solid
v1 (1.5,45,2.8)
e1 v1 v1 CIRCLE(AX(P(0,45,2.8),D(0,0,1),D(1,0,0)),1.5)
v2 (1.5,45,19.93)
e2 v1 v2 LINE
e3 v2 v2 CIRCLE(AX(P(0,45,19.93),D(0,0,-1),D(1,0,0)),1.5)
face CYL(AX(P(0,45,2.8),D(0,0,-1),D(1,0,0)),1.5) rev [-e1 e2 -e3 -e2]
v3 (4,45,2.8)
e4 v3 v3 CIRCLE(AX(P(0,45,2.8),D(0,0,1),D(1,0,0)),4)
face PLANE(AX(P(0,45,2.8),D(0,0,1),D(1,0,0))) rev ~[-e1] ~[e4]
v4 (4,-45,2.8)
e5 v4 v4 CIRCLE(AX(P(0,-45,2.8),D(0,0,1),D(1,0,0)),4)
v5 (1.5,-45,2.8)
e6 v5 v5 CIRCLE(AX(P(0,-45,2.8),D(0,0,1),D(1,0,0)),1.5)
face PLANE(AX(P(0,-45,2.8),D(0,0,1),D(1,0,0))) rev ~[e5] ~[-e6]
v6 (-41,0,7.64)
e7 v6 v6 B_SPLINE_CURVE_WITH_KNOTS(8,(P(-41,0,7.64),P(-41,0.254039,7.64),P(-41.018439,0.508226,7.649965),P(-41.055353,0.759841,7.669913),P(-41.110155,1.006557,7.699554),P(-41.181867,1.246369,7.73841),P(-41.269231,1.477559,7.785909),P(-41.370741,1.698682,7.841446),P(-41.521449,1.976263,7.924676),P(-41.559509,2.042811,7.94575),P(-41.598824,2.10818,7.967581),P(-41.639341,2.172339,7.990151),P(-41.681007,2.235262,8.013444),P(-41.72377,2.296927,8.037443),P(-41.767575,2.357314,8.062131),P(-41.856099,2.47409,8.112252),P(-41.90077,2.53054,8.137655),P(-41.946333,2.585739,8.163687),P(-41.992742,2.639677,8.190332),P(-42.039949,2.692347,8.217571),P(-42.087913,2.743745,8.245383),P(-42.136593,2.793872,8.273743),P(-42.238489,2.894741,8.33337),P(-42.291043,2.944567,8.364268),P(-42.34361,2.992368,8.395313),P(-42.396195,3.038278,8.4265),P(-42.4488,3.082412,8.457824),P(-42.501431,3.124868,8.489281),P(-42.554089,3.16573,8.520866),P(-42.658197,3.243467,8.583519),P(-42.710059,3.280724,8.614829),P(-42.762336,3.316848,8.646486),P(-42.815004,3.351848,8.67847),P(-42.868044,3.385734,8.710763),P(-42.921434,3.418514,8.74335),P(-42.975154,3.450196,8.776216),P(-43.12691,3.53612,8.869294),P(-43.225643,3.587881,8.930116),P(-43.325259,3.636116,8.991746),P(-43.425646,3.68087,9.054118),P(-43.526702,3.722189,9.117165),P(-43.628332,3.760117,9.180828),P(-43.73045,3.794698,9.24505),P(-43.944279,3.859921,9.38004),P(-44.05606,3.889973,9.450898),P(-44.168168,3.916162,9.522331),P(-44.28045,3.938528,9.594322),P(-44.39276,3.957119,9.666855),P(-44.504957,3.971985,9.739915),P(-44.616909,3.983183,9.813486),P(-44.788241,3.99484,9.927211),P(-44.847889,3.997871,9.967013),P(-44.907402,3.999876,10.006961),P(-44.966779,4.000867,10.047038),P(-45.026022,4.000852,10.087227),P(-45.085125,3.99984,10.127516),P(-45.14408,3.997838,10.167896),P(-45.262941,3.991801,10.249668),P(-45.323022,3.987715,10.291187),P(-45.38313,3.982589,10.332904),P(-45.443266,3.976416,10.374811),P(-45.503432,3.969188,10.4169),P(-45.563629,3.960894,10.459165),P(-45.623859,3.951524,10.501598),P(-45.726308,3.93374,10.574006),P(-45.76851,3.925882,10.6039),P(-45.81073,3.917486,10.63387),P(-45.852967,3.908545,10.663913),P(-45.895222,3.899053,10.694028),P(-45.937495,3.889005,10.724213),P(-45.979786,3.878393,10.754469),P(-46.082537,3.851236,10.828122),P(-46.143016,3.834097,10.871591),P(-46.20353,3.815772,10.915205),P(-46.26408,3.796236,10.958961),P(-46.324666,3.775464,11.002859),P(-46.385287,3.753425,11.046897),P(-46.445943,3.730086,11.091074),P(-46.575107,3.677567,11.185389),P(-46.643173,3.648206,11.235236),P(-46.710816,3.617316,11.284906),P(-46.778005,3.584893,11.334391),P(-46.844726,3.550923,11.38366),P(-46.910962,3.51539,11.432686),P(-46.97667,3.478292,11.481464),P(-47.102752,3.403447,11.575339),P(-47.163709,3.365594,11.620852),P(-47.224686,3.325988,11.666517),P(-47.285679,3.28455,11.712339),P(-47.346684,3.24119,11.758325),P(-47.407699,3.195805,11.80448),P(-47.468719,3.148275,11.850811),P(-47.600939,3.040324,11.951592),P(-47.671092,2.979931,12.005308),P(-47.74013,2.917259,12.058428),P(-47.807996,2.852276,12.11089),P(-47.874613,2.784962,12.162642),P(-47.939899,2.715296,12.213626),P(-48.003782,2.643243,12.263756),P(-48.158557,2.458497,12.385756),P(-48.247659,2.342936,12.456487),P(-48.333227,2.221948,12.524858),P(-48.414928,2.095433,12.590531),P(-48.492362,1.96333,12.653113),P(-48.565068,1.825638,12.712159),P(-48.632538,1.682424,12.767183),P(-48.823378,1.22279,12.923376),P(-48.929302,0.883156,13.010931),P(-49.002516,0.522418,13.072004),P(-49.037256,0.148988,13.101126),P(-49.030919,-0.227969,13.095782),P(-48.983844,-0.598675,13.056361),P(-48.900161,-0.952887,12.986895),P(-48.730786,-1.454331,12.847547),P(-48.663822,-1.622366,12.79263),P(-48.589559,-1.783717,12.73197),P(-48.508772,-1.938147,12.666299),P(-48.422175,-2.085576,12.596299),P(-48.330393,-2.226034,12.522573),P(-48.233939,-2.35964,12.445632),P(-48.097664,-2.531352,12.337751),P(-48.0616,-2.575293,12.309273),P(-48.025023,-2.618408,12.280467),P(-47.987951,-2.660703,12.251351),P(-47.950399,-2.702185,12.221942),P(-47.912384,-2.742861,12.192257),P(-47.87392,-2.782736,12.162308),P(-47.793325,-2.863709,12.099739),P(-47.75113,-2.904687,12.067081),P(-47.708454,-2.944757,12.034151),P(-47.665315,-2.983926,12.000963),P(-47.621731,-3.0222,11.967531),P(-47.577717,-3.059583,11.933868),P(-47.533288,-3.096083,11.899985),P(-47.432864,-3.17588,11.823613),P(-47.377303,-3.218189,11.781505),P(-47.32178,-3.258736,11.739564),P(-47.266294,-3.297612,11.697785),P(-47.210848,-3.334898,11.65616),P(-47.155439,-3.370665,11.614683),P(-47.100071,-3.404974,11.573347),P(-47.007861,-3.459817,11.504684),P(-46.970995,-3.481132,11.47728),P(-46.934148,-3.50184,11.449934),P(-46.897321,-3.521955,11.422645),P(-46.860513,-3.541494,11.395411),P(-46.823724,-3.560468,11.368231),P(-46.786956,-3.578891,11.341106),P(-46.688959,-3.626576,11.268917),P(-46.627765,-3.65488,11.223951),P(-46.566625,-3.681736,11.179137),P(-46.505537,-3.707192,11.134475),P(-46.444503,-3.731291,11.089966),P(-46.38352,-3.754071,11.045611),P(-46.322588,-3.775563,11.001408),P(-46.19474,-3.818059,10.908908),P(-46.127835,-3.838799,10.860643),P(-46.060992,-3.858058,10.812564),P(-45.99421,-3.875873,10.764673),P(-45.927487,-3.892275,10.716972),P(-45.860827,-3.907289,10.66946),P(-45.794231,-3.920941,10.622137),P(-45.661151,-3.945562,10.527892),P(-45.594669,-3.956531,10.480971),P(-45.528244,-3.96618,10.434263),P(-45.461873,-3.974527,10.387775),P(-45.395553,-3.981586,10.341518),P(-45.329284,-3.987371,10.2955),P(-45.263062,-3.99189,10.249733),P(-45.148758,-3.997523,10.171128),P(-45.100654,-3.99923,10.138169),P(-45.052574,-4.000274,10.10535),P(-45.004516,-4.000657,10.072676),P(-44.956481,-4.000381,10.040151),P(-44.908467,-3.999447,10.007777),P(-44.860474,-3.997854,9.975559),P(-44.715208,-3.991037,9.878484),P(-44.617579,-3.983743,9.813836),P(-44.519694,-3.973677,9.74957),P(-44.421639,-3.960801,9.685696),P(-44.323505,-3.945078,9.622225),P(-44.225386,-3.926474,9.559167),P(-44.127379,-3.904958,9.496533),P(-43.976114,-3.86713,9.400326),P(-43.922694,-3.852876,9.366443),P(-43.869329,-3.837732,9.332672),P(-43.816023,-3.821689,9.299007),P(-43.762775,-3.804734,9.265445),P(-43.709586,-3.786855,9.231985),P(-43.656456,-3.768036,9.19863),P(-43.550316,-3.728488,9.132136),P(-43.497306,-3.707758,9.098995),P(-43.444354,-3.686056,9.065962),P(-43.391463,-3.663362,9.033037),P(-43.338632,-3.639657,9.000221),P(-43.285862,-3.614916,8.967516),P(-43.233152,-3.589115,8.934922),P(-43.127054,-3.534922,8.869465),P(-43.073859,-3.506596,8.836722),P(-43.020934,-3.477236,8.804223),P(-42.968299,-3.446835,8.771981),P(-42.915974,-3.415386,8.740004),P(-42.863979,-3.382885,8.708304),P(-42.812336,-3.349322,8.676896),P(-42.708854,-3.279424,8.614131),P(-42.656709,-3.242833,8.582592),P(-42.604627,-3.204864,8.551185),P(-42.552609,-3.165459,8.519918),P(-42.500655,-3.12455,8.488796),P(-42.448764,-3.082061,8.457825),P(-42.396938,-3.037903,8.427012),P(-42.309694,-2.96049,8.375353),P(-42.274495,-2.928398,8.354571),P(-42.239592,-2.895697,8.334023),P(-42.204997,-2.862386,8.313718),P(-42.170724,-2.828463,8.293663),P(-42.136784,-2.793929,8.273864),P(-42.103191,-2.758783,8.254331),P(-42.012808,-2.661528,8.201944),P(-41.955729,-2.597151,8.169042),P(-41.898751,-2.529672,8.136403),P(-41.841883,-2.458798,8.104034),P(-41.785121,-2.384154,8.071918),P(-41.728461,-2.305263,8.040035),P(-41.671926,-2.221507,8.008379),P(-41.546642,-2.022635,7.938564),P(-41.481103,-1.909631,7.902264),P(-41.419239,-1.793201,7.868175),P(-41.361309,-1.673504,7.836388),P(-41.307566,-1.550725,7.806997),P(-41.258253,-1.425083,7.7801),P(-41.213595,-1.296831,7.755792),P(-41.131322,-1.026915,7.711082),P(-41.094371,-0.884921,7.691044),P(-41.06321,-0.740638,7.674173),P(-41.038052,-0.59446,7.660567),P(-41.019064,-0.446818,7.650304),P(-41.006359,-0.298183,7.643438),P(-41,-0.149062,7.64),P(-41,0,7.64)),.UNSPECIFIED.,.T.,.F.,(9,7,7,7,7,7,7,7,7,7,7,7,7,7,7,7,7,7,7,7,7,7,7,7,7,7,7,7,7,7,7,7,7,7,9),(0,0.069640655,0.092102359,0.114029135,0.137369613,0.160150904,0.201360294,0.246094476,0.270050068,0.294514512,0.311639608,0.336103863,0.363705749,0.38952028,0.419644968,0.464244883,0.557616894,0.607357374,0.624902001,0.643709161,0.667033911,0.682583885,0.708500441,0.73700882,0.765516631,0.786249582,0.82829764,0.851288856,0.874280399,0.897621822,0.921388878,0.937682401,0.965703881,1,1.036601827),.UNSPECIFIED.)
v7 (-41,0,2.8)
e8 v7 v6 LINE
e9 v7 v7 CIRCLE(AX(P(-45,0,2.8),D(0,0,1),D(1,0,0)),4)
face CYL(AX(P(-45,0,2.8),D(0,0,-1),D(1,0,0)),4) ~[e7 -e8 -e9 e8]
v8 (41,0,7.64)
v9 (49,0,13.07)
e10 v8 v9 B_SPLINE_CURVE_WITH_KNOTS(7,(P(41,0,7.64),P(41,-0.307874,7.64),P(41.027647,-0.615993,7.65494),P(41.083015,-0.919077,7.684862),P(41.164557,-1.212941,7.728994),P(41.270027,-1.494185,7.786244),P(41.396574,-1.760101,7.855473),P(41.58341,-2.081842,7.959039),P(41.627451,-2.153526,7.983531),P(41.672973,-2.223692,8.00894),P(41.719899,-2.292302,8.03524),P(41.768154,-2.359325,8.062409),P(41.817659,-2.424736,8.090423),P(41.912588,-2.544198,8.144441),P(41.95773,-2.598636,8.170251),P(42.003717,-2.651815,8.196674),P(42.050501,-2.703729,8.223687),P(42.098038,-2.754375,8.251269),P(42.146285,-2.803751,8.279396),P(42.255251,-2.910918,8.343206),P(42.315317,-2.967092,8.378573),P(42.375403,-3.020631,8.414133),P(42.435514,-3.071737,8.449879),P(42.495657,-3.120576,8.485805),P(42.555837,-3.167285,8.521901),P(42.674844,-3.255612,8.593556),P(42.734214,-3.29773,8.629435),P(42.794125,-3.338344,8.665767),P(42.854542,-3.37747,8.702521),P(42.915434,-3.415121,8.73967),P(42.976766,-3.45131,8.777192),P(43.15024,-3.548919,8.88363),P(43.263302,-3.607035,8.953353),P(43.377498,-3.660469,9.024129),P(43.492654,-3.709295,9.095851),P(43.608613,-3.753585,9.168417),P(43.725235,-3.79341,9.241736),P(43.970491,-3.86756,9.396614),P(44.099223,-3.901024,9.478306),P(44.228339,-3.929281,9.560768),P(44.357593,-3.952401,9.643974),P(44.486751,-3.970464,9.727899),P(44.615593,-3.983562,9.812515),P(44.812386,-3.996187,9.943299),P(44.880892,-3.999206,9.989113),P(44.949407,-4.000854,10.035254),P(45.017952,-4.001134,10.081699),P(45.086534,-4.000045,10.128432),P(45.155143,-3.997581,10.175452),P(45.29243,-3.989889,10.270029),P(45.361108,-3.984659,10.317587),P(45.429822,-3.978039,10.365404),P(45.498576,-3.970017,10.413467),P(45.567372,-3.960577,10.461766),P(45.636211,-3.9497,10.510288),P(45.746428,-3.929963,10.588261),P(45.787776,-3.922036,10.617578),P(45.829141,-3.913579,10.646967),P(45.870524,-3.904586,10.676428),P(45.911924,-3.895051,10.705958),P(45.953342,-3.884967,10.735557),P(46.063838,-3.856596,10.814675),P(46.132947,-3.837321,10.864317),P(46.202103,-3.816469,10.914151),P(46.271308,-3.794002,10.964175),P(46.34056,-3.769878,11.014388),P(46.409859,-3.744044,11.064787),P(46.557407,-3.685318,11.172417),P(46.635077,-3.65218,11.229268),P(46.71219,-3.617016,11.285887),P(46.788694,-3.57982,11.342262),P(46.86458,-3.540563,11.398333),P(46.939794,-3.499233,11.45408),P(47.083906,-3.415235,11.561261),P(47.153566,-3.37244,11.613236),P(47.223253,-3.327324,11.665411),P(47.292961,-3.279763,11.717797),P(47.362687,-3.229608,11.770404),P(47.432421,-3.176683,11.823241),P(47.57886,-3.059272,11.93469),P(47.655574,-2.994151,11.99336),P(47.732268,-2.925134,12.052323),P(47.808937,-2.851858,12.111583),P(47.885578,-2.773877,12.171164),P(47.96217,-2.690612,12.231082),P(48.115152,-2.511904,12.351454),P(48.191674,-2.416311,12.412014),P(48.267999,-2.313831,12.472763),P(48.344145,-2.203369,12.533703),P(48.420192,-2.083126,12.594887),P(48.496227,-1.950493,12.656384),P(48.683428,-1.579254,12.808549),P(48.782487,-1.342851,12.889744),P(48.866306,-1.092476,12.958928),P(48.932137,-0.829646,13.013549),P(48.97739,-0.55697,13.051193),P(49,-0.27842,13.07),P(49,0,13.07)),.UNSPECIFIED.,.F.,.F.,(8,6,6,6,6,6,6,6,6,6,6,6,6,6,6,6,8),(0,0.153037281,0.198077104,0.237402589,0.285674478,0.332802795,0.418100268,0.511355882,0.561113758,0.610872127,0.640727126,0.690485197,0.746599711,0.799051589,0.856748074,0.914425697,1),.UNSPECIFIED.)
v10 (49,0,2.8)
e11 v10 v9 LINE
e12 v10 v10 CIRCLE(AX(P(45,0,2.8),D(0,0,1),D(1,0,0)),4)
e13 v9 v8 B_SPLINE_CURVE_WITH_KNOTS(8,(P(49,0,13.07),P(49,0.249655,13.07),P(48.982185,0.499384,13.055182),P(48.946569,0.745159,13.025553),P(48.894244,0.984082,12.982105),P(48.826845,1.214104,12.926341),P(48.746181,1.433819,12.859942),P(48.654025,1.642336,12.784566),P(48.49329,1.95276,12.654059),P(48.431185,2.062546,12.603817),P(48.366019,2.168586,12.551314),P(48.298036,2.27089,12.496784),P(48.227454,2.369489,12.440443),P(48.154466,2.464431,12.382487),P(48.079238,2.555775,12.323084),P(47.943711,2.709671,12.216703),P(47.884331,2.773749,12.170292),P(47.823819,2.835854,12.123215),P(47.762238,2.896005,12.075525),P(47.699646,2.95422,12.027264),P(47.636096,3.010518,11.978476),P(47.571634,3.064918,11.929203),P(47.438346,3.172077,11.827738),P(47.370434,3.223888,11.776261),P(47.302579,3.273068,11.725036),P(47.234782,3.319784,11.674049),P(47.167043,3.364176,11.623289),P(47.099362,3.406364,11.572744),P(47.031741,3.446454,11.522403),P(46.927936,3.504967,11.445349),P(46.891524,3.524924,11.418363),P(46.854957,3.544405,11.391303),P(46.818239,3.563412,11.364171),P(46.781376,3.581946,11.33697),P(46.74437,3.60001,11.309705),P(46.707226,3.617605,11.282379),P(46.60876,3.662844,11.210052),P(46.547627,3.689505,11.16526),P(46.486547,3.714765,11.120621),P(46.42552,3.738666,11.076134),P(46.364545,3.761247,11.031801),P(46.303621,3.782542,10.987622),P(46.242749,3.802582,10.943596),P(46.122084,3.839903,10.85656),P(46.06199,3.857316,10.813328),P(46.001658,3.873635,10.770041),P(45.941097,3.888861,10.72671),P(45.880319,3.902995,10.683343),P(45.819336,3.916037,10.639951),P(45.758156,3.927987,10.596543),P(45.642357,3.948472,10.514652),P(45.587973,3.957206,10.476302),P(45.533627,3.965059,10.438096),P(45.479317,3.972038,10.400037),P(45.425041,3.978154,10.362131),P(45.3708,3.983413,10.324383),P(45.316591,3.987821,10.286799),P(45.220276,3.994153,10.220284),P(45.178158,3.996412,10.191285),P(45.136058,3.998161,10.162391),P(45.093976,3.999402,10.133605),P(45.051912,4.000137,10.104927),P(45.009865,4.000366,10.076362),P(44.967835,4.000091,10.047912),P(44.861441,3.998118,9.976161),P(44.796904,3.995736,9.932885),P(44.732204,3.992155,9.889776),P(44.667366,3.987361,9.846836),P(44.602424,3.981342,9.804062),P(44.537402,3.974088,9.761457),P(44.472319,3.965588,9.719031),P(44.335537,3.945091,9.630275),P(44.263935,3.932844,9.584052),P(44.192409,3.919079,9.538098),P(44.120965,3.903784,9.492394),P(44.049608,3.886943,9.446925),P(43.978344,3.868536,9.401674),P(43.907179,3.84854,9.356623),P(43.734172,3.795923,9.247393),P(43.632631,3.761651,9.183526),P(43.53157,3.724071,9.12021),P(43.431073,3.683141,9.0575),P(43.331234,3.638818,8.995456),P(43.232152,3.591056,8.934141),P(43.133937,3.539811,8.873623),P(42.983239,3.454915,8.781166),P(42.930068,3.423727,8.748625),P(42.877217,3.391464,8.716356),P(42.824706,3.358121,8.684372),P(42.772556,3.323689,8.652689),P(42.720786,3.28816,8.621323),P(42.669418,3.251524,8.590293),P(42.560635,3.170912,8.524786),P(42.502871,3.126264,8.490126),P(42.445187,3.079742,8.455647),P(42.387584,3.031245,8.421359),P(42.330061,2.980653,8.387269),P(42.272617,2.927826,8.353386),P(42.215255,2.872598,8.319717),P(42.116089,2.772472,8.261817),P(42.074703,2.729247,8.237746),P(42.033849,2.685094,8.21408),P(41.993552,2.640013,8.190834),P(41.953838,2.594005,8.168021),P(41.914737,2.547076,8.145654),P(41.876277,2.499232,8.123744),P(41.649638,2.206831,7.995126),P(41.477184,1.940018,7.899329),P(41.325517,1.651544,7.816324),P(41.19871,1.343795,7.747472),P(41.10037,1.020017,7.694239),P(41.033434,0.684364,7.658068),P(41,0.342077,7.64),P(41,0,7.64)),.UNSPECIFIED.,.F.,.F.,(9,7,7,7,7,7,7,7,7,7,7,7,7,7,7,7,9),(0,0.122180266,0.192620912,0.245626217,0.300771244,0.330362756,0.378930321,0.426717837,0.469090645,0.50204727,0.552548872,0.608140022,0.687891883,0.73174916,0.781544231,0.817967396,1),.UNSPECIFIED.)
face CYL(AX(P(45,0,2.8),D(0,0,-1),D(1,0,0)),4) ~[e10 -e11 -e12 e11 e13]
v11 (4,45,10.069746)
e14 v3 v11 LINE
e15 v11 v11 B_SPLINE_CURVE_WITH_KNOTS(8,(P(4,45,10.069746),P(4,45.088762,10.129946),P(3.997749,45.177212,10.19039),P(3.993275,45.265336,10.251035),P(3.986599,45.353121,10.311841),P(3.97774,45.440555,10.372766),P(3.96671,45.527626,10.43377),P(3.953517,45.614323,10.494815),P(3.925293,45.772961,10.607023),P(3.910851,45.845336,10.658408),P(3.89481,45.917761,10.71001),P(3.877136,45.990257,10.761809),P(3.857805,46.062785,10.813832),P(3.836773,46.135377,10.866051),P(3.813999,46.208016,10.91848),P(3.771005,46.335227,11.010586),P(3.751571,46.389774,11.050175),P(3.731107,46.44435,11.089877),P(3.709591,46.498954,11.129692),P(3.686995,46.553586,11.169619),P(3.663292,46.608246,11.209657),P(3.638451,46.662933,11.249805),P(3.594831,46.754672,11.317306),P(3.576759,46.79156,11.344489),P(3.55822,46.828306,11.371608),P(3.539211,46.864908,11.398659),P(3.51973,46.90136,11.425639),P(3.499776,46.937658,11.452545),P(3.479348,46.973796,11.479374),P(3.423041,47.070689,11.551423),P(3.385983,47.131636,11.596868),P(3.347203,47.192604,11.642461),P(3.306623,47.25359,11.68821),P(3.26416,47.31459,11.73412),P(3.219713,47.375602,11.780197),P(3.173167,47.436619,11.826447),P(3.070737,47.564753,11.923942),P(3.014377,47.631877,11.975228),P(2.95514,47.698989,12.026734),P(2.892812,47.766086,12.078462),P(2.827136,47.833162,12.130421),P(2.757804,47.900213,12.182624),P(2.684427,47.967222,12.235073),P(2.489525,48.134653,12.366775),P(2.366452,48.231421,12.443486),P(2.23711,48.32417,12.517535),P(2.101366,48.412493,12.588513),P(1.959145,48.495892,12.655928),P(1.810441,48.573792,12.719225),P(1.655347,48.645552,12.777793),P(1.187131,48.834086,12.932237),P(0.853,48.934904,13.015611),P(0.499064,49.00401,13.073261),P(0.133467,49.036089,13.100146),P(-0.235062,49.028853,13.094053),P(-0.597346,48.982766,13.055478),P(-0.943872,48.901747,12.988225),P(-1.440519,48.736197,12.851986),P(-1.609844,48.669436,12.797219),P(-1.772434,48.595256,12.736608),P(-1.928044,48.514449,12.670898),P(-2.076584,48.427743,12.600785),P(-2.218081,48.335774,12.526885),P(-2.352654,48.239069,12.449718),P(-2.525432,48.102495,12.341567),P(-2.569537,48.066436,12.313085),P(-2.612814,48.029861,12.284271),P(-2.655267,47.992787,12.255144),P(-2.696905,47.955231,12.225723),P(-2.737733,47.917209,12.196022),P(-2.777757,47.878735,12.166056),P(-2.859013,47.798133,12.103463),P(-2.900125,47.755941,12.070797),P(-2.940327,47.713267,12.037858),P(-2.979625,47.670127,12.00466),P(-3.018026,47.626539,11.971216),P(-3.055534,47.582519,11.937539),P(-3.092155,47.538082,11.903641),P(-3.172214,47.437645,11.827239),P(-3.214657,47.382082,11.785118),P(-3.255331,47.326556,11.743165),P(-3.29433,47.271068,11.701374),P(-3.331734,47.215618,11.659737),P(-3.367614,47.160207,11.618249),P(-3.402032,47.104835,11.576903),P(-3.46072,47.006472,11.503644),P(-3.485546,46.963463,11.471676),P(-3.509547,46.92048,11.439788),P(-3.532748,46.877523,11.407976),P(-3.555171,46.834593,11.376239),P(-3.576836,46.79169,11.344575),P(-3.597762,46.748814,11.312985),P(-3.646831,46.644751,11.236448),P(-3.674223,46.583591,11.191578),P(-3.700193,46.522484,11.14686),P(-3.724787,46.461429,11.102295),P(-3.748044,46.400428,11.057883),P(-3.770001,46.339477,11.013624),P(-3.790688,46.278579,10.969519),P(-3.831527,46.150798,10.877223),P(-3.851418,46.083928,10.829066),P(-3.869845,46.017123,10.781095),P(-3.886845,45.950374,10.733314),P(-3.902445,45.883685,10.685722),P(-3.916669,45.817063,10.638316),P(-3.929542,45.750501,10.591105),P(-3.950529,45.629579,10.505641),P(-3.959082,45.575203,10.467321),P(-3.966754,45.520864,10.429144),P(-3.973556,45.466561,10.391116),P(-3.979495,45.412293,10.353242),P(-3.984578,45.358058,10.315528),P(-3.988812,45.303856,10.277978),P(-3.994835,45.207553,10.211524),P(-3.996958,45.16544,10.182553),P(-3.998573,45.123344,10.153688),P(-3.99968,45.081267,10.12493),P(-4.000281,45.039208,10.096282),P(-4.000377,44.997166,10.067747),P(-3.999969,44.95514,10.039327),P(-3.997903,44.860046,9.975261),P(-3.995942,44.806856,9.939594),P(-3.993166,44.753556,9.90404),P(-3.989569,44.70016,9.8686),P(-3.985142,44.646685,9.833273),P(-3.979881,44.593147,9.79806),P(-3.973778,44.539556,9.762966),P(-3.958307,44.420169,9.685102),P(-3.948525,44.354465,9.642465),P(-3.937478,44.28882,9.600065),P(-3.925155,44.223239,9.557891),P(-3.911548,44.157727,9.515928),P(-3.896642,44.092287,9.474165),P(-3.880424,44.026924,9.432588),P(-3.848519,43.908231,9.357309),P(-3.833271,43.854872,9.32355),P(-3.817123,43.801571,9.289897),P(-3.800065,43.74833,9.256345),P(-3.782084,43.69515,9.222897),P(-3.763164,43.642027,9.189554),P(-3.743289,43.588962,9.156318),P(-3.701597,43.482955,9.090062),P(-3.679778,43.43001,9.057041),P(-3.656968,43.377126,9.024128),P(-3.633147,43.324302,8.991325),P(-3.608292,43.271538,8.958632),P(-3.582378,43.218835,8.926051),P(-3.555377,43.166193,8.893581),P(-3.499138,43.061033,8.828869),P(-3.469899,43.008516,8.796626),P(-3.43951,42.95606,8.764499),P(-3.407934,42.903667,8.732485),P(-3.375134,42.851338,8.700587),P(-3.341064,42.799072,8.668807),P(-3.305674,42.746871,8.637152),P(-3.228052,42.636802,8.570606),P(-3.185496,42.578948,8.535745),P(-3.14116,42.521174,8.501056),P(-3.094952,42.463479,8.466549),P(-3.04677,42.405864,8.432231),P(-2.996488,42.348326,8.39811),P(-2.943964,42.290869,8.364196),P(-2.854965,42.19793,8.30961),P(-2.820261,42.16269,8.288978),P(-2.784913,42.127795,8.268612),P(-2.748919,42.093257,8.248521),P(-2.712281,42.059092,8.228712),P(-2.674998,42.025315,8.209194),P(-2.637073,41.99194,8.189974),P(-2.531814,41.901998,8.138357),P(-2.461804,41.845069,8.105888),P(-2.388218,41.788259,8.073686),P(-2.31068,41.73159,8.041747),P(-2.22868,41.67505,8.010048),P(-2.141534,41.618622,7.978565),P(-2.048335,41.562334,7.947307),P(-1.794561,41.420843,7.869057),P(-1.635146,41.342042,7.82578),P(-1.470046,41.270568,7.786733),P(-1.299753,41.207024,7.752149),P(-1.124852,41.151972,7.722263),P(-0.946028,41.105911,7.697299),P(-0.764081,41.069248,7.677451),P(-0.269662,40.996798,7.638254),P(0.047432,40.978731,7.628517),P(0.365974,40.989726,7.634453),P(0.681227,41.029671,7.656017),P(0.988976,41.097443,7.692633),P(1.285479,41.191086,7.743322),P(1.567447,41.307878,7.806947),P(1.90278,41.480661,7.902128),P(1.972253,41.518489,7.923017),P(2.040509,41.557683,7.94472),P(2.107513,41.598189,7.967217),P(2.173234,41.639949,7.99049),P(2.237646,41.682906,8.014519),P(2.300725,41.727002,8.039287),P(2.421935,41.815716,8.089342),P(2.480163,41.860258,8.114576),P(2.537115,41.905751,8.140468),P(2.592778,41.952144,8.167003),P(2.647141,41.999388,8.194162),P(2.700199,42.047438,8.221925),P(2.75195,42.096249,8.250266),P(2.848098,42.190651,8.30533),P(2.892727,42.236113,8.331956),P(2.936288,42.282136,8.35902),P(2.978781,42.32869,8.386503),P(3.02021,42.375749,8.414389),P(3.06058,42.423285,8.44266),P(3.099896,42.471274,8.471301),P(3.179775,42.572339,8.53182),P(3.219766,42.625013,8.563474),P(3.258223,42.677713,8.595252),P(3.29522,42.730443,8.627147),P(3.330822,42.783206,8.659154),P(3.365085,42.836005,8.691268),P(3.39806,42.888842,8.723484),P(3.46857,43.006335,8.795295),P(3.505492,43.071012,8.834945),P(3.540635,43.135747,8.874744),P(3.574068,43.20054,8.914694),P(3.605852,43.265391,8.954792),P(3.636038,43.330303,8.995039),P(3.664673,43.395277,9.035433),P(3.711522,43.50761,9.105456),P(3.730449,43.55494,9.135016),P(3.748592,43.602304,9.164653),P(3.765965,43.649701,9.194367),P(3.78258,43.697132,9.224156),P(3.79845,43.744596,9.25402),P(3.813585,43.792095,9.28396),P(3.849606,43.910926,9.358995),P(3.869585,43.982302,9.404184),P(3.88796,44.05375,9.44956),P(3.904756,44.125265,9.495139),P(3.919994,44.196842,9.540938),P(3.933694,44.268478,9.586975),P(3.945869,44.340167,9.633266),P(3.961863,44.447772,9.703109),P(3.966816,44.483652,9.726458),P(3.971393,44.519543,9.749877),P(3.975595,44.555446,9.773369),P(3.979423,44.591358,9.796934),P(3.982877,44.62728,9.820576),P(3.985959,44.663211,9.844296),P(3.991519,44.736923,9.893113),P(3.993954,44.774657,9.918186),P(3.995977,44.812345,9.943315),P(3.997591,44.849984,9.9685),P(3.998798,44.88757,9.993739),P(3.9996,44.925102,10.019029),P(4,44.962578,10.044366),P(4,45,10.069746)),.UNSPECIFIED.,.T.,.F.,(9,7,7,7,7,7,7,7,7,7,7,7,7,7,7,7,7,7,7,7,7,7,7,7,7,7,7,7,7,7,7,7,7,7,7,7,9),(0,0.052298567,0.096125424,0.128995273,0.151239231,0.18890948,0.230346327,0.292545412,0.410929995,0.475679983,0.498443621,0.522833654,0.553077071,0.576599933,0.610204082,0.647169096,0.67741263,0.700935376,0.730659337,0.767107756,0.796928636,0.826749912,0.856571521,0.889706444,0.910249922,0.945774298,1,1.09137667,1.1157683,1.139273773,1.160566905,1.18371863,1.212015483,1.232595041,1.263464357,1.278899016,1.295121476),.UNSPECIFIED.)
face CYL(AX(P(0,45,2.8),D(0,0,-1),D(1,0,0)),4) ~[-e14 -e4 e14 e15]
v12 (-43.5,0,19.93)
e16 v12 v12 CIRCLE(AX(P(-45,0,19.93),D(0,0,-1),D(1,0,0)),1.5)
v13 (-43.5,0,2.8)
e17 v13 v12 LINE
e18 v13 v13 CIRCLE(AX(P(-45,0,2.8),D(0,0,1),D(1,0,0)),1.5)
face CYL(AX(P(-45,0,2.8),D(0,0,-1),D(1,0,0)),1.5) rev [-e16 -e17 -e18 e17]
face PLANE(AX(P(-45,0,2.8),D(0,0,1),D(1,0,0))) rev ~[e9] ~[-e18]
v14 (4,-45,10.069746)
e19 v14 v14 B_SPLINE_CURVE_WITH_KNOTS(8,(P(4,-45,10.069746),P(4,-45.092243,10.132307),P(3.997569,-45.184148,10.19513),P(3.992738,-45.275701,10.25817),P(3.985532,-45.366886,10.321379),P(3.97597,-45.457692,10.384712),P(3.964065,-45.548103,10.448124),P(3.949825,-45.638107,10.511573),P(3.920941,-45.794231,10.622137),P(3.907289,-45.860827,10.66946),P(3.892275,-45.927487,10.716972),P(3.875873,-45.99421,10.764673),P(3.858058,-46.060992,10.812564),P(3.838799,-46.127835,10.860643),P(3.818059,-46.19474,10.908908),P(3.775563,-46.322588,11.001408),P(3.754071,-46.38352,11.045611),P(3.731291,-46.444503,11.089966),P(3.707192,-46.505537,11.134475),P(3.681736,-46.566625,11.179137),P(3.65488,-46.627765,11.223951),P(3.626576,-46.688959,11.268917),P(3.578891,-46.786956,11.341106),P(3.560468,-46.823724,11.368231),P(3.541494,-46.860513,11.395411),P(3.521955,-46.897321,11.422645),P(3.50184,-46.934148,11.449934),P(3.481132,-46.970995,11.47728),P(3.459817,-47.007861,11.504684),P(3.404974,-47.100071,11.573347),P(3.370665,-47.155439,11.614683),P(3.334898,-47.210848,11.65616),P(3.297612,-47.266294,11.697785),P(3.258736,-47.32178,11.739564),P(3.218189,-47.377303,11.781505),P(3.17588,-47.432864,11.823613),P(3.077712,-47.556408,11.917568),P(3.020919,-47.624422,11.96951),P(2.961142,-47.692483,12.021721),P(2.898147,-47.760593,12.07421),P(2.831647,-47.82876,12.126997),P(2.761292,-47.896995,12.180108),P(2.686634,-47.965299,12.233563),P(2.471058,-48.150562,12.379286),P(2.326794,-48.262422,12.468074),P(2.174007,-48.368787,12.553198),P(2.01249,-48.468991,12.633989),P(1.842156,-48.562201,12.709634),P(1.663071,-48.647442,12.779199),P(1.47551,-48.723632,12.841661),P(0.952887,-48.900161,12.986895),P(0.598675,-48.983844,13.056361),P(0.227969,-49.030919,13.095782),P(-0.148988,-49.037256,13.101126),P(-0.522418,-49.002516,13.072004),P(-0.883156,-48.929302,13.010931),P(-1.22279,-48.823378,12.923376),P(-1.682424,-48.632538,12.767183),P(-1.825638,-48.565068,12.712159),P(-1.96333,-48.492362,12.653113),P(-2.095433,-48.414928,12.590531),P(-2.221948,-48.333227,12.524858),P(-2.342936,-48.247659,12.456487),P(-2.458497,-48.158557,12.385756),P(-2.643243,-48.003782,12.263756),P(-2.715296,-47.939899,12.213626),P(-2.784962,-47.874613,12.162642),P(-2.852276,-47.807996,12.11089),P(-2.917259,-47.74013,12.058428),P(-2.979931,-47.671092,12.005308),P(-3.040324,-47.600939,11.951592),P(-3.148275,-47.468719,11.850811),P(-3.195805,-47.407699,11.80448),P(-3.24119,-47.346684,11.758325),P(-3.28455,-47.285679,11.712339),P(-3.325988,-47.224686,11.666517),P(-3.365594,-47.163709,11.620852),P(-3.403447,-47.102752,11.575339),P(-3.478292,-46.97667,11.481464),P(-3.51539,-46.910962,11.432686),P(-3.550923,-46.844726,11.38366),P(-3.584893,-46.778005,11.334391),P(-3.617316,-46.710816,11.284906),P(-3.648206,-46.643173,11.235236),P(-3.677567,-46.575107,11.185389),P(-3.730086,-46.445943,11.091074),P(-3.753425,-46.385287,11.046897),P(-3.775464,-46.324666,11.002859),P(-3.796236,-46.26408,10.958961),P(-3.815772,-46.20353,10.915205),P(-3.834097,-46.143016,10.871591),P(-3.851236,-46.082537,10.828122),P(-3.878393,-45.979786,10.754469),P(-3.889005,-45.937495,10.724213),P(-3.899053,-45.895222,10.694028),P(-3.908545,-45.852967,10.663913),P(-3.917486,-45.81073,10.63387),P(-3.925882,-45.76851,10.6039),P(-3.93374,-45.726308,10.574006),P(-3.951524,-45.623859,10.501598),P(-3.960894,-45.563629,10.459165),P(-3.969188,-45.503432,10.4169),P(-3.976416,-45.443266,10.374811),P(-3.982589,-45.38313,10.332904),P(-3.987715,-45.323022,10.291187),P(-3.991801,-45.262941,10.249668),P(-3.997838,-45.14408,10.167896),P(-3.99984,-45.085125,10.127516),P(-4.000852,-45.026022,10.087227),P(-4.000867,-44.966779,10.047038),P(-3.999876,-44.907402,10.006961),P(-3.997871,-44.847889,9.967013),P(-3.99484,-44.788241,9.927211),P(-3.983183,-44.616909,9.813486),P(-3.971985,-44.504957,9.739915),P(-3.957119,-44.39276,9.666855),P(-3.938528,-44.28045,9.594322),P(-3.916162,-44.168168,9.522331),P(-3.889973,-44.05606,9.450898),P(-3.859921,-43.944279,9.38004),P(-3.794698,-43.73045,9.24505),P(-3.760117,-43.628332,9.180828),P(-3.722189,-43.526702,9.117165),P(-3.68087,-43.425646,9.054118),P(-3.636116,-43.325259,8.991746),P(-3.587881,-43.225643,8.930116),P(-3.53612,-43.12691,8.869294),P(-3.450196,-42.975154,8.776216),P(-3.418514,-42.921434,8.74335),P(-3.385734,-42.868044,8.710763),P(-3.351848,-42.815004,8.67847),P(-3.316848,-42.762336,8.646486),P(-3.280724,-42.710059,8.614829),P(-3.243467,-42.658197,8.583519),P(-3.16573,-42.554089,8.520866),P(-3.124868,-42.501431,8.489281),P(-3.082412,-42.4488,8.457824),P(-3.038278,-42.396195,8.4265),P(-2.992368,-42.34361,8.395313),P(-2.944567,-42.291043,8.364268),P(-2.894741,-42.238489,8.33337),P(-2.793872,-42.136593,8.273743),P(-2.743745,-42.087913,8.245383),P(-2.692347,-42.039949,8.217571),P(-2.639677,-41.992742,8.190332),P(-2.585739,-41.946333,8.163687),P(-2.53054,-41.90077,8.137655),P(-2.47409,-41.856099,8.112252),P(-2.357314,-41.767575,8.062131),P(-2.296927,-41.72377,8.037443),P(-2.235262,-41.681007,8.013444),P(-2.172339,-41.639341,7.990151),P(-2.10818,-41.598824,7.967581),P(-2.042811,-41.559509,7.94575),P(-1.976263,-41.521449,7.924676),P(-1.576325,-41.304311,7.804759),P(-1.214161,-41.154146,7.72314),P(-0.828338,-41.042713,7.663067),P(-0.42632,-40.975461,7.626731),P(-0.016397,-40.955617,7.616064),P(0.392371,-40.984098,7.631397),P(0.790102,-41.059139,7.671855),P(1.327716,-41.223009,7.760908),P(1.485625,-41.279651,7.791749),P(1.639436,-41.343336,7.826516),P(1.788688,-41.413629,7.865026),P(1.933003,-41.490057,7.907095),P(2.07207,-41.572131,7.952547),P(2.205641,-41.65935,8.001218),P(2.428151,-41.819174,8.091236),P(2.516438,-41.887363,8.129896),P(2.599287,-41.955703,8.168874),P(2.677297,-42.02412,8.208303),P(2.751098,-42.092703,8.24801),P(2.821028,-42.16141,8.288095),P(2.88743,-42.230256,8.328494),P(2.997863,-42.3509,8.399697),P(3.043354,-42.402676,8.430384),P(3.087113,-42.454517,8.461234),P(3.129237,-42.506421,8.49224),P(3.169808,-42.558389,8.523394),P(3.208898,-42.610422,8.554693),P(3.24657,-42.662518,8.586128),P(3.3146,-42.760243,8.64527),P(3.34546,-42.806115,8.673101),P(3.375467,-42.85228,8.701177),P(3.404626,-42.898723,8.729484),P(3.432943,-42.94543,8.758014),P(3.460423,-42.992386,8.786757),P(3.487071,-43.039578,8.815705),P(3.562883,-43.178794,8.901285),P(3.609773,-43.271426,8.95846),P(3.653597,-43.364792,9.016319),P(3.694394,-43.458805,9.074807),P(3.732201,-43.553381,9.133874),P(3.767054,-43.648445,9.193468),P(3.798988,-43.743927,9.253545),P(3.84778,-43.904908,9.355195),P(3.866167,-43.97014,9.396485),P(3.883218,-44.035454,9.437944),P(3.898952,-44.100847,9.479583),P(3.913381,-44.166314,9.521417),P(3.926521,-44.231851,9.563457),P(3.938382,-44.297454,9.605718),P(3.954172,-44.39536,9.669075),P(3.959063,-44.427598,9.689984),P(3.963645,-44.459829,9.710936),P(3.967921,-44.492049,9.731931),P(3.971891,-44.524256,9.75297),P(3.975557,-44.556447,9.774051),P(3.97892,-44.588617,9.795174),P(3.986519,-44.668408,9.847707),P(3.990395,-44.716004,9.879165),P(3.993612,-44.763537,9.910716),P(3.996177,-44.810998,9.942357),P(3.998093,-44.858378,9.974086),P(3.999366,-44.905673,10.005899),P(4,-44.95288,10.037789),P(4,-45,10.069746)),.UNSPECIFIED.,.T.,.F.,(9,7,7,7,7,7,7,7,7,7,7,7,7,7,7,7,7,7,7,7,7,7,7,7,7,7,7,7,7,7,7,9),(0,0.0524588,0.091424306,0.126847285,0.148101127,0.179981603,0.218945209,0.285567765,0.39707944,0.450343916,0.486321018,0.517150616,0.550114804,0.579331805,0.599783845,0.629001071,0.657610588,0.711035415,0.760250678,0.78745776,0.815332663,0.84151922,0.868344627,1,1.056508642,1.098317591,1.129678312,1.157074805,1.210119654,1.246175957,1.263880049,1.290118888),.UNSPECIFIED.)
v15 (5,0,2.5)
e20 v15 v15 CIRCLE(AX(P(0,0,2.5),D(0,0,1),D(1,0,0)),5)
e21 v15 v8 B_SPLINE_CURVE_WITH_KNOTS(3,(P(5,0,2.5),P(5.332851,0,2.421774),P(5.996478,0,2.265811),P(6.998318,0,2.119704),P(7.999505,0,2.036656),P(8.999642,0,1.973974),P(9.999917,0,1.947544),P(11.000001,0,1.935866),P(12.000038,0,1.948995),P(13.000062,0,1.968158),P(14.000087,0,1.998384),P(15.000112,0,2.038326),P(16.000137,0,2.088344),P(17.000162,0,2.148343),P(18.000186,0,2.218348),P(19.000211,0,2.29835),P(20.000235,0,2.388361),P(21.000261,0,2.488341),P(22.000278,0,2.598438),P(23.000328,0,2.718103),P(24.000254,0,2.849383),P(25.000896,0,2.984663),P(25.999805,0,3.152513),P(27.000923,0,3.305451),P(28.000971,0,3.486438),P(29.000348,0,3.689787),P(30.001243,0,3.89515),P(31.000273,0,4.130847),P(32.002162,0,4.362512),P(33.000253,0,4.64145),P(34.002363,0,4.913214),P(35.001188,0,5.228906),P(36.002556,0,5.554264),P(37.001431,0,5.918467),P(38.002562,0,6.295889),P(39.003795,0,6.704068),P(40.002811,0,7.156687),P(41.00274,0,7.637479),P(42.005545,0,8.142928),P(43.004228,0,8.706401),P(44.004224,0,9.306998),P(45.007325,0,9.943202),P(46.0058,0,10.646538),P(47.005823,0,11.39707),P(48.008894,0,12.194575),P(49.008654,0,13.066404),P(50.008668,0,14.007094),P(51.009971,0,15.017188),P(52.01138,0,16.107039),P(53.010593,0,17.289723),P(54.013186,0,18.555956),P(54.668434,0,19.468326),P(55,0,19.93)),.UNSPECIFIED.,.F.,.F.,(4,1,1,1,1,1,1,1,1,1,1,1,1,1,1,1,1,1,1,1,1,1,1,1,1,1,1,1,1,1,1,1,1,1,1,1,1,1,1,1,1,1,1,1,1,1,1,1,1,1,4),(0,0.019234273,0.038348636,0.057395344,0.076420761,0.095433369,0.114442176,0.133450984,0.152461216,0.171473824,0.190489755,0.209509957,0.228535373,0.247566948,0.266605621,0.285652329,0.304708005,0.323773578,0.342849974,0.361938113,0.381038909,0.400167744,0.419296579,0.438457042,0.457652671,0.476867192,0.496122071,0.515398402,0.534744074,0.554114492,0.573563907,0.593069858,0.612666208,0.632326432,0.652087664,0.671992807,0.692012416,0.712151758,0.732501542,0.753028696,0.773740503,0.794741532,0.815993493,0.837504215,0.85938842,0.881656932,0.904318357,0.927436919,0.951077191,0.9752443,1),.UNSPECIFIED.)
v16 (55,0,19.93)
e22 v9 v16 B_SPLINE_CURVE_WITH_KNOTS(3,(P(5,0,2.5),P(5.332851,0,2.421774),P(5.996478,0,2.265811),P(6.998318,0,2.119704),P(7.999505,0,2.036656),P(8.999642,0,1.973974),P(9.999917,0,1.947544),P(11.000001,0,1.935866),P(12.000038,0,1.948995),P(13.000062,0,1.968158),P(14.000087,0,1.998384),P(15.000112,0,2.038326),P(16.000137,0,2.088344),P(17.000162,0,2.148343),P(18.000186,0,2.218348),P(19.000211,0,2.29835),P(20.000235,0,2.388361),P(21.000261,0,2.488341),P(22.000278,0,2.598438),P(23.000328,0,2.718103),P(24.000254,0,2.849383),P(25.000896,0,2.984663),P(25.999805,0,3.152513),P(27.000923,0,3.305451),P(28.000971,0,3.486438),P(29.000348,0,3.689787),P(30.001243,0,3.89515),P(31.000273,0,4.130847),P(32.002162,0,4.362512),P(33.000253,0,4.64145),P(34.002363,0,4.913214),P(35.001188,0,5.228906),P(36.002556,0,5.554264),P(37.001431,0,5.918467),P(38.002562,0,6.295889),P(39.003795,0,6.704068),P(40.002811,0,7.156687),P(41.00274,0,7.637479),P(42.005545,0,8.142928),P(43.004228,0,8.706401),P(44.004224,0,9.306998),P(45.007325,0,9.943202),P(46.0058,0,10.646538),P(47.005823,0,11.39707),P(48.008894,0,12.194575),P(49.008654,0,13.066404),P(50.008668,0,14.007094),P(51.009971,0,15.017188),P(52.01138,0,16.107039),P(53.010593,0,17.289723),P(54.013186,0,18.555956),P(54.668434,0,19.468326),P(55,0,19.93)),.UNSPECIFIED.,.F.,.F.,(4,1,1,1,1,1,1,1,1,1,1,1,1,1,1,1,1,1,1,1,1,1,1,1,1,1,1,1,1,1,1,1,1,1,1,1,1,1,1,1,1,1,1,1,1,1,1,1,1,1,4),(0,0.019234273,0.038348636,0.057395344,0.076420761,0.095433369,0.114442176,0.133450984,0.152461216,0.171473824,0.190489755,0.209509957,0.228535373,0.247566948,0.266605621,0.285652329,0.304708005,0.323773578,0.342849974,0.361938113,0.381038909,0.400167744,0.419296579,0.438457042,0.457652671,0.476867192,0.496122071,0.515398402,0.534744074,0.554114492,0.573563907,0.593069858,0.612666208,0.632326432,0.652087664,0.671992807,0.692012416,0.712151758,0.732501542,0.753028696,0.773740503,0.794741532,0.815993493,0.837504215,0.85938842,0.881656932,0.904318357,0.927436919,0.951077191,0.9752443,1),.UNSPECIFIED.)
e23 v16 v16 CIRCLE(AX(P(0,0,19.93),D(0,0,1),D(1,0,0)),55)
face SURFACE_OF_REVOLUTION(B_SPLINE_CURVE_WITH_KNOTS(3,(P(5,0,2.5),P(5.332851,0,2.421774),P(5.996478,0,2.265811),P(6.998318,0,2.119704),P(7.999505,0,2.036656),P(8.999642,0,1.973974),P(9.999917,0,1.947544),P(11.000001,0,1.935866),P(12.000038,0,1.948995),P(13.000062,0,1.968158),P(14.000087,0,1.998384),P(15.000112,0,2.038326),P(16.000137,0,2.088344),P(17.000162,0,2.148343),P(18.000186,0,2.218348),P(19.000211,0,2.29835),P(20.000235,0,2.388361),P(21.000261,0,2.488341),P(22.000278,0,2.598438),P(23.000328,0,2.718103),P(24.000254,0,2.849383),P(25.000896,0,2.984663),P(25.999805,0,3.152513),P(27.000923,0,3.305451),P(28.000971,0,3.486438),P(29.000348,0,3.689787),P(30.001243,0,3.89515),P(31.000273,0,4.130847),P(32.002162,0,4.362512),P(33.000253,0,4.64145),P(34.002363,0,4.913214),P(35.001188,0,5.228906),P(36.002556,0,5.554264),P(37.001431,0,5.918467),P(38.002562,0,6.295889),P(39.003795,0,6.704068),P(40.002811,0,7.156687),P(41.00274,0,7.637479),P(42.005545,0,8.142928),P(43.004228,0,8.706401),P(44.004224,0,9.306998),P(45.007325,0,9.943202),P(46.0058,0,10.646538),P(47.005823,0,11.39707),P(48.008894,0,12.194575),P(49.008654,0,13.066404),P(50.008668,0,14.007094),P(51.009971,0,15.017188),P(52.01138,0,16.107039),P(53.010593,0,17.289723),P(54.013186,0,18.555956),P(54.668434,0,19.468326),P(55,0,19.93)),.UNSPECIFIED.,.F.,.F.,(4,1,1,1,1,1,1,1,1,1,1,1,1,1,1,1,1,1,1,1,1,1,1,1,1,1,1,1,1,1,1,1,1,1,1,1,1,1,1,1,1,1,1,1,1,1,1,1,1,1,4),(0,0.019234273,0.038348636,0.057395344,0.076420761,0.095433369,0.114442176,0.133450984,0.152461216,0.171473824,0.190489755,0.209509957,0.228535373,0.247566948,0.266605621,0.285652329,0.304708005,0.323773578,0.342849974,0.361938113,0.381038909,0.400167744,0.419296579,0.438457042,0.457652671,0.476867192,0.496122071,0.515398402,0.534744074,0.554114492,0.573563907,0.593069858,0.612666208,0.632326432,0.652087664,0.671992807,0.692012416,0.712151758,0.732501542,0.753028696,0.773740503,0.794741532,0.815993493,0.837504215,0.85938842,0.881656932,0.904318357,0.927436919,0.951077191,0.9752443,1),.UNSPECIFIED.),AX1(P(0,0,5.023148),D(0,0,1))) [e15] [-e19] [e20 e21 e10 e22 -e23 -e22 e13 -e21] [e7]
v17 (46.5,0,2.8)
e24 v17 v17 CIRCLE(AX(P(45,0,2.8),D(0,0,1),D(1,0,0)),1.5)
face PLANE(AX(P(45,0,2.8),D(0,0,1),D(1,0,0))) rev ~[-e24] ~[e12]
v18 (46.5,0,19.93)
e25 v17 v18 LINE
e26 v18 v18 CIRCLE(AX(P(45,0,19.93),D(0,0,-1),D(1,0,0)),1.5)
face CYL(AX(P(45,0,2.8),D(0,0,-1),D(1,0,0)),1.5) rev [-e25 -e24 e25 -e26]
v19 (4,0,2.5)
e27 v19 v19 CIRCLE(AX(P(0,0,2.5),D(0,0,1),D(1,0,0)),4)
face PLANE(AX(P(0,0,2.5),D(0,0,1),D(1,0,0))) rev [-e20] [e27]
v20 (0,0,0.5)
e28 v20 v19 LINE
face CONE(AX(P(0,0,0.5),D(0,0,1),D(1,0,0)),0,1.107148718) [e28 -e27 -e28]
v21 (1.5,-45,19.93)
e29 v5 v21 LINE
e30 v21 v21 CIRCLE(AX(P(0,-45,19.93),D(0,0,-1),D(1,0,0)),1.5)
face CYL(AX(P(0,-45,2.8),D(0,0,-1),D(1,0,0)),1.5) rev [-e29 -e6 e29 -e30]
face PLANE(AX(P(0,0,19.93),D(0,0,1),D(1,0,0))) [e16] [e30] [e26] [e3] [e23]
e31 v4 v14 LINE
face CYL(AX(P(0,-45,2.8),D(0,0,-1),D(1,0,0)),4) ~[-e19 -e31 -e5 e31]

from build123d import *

# Parameters (mm, degrees)
F3_R     = 4
F4_DEPTH = 12
F5_R     = 1.5
F6_DEPTH = 25


with BuildPart() as f1:
    # F0 (on Front) → F1 (revolve)
    with BuildSketch(Plane.XZ):
        with BuildLine():
            Line((0, 19.93), (0, 2.5))
            Line((0, 2.5), (5, 2.5))
            add(Edge.make_bspline(
                [(5, 2.5), (5.3328510826, 2.4217743273), (5.9964782101, 2.2658106511), (6.9983179352, 2.1197039578), (7.9995053084, 2.0366561555), (8.9996417233, 1.9739737746), (9.9999165926, 1.9475438797), (11.0000008446, 1.935865527), (12.0000383829, 1.9489951187), (13.0000622241, 1.9681576208), (14.0000874592, 1.9983838356), (15.0001122592, 2.0383255927), (16.0001370916, 2.0883442574), (17.0001618271, 2.148342783), (18.0001864282, 2.2183478788), (19.0002110875, 2.2983497638), (20.0002349857, 2.3883608236), (21.0002611249, 2.4883412474), (22.0002782257, 2.5984379641), (23.0003283544, 2.7181026114), (24.0002543135, 2.8493833922), (25.000895917, 2.9846630387), (25.9998052646, 3.1525131019), (27.0009227888, 3.3054508496), (28.0009713029, 3.4864375887), (29.0003478858, 3.6897873256), (30.0012434797, 3.8951500576), (31.0002728406, 4.1308468645), (32.0021624026, 4.3625117569), (33.0002529532, 4.6414496195), (34.0023629695, 4.9132136305), (35.0011881909, 5.2289056776), (36.0025557063, 5.5542640629), (37.0014311173, 5.9184670669), (38.0025624421, 6.2958891719), (39.0037946478, 6.7040678184), (40.0028107947, 7.1566870694), (41.0027396353, 7.6374785101), (42.0055454925, 8.1429278876), (43.004228325, 8.7064011364), (44.004224438, 9.306997806), (45.0073247322, 9.9432016714), (46.0057995192, 10.6465378886), (47.0058234103, 11.3970699492), (48.0088937531, 12.1945745949), (49.0086544899, 13.0664036563), (50.0086681154, 14.007093901), (51.009971062, 15.0171879868), (52.0113800481, 16.1070392374), (53.010593298, 17.2897231439), (54.0131863874, 18.5559560931), (54.6684343672, 19.4683264564), (55, 19.93)],
                knots=[0, 0, 0, 0, 0.0192342727, 0.0383486364, 0.0573953442, 0.0764207609, 0.0954333686, 0.1144421761, 0.1334509836, 0.1524612165, 0.1714738242, 0.1904897553, 0.2095099566, 0.2285353734, 0.2475669482, 0.2666056211, 0.285652329, 0.3047080049, 0.3237735783, 0.3428499742, 0.3619381127, 0.3810389089, 0.4001677438, 0.4192965787, 0.4384570424, 0.4576526715, 0.4768671915, 0.4961220706, 0.5153984017, 0.534744074, 0.5541144917, 0.5735639074, 0.5930698576, 0.6126662076, 0.6323264323, 0.6520876645, 0.6719928068, 0.6920124161, 0.7121517577, 0.7325015415, 0.7530286956, 0.7737405025, 0.7947415319, 0.8159934935, 0.837504215, 0.8593884201, 0.8816569315, 0.9043183574, 0.9274369188, 0.9510771906, 0.9752443002, 1, 1, 1, 1], degree=3))
            Line((55, 19.93), (0, 19.93))
        make_face()
    revolve(axis=Axis((0, 0, 5.0231479108), (0, 0, 1)))

    # F3 (on offset) → F4 (join)
    with BuildSketch(Plane.XY.offset(2.8)):
        with Locations((0, -45)):
            Circle(F3_R)
        with Locations((45, 0)):
            Circle(F3_R)
        with Locations((0, 45)):
            Circle(F3_R)
        with Locations((-45, 0)):
            Circle(F3_R)
    extrude(amount=F4_DEPTH)

    # F5 (on offset) → F6 (cut)
    with BuildSketch(Plane.XY.offset(2.8)):
        with Locations((45, 0)):
            Circle(F5_R)
        with Locations((0, -45)):
            Circle(F5_R)
        with Locations((-45, 0)):
            Circle(F5_R)
        with Locations((0, 45)):
            Circle(F5_R)
    extrude(amount=F6_DEPTH, mode=Mode.SUBTRACT)

    # F7 (on Front) → F8 (revolve)
    with BuildSketch(Plane.XZ):
        Polygon((4, 2.5), (0, 2.5), (0, 0.5), align=None)
    revolve(axis=Axis((0, 0, 9.9652772769), (0, 0, 1)))


solid = f1.part
